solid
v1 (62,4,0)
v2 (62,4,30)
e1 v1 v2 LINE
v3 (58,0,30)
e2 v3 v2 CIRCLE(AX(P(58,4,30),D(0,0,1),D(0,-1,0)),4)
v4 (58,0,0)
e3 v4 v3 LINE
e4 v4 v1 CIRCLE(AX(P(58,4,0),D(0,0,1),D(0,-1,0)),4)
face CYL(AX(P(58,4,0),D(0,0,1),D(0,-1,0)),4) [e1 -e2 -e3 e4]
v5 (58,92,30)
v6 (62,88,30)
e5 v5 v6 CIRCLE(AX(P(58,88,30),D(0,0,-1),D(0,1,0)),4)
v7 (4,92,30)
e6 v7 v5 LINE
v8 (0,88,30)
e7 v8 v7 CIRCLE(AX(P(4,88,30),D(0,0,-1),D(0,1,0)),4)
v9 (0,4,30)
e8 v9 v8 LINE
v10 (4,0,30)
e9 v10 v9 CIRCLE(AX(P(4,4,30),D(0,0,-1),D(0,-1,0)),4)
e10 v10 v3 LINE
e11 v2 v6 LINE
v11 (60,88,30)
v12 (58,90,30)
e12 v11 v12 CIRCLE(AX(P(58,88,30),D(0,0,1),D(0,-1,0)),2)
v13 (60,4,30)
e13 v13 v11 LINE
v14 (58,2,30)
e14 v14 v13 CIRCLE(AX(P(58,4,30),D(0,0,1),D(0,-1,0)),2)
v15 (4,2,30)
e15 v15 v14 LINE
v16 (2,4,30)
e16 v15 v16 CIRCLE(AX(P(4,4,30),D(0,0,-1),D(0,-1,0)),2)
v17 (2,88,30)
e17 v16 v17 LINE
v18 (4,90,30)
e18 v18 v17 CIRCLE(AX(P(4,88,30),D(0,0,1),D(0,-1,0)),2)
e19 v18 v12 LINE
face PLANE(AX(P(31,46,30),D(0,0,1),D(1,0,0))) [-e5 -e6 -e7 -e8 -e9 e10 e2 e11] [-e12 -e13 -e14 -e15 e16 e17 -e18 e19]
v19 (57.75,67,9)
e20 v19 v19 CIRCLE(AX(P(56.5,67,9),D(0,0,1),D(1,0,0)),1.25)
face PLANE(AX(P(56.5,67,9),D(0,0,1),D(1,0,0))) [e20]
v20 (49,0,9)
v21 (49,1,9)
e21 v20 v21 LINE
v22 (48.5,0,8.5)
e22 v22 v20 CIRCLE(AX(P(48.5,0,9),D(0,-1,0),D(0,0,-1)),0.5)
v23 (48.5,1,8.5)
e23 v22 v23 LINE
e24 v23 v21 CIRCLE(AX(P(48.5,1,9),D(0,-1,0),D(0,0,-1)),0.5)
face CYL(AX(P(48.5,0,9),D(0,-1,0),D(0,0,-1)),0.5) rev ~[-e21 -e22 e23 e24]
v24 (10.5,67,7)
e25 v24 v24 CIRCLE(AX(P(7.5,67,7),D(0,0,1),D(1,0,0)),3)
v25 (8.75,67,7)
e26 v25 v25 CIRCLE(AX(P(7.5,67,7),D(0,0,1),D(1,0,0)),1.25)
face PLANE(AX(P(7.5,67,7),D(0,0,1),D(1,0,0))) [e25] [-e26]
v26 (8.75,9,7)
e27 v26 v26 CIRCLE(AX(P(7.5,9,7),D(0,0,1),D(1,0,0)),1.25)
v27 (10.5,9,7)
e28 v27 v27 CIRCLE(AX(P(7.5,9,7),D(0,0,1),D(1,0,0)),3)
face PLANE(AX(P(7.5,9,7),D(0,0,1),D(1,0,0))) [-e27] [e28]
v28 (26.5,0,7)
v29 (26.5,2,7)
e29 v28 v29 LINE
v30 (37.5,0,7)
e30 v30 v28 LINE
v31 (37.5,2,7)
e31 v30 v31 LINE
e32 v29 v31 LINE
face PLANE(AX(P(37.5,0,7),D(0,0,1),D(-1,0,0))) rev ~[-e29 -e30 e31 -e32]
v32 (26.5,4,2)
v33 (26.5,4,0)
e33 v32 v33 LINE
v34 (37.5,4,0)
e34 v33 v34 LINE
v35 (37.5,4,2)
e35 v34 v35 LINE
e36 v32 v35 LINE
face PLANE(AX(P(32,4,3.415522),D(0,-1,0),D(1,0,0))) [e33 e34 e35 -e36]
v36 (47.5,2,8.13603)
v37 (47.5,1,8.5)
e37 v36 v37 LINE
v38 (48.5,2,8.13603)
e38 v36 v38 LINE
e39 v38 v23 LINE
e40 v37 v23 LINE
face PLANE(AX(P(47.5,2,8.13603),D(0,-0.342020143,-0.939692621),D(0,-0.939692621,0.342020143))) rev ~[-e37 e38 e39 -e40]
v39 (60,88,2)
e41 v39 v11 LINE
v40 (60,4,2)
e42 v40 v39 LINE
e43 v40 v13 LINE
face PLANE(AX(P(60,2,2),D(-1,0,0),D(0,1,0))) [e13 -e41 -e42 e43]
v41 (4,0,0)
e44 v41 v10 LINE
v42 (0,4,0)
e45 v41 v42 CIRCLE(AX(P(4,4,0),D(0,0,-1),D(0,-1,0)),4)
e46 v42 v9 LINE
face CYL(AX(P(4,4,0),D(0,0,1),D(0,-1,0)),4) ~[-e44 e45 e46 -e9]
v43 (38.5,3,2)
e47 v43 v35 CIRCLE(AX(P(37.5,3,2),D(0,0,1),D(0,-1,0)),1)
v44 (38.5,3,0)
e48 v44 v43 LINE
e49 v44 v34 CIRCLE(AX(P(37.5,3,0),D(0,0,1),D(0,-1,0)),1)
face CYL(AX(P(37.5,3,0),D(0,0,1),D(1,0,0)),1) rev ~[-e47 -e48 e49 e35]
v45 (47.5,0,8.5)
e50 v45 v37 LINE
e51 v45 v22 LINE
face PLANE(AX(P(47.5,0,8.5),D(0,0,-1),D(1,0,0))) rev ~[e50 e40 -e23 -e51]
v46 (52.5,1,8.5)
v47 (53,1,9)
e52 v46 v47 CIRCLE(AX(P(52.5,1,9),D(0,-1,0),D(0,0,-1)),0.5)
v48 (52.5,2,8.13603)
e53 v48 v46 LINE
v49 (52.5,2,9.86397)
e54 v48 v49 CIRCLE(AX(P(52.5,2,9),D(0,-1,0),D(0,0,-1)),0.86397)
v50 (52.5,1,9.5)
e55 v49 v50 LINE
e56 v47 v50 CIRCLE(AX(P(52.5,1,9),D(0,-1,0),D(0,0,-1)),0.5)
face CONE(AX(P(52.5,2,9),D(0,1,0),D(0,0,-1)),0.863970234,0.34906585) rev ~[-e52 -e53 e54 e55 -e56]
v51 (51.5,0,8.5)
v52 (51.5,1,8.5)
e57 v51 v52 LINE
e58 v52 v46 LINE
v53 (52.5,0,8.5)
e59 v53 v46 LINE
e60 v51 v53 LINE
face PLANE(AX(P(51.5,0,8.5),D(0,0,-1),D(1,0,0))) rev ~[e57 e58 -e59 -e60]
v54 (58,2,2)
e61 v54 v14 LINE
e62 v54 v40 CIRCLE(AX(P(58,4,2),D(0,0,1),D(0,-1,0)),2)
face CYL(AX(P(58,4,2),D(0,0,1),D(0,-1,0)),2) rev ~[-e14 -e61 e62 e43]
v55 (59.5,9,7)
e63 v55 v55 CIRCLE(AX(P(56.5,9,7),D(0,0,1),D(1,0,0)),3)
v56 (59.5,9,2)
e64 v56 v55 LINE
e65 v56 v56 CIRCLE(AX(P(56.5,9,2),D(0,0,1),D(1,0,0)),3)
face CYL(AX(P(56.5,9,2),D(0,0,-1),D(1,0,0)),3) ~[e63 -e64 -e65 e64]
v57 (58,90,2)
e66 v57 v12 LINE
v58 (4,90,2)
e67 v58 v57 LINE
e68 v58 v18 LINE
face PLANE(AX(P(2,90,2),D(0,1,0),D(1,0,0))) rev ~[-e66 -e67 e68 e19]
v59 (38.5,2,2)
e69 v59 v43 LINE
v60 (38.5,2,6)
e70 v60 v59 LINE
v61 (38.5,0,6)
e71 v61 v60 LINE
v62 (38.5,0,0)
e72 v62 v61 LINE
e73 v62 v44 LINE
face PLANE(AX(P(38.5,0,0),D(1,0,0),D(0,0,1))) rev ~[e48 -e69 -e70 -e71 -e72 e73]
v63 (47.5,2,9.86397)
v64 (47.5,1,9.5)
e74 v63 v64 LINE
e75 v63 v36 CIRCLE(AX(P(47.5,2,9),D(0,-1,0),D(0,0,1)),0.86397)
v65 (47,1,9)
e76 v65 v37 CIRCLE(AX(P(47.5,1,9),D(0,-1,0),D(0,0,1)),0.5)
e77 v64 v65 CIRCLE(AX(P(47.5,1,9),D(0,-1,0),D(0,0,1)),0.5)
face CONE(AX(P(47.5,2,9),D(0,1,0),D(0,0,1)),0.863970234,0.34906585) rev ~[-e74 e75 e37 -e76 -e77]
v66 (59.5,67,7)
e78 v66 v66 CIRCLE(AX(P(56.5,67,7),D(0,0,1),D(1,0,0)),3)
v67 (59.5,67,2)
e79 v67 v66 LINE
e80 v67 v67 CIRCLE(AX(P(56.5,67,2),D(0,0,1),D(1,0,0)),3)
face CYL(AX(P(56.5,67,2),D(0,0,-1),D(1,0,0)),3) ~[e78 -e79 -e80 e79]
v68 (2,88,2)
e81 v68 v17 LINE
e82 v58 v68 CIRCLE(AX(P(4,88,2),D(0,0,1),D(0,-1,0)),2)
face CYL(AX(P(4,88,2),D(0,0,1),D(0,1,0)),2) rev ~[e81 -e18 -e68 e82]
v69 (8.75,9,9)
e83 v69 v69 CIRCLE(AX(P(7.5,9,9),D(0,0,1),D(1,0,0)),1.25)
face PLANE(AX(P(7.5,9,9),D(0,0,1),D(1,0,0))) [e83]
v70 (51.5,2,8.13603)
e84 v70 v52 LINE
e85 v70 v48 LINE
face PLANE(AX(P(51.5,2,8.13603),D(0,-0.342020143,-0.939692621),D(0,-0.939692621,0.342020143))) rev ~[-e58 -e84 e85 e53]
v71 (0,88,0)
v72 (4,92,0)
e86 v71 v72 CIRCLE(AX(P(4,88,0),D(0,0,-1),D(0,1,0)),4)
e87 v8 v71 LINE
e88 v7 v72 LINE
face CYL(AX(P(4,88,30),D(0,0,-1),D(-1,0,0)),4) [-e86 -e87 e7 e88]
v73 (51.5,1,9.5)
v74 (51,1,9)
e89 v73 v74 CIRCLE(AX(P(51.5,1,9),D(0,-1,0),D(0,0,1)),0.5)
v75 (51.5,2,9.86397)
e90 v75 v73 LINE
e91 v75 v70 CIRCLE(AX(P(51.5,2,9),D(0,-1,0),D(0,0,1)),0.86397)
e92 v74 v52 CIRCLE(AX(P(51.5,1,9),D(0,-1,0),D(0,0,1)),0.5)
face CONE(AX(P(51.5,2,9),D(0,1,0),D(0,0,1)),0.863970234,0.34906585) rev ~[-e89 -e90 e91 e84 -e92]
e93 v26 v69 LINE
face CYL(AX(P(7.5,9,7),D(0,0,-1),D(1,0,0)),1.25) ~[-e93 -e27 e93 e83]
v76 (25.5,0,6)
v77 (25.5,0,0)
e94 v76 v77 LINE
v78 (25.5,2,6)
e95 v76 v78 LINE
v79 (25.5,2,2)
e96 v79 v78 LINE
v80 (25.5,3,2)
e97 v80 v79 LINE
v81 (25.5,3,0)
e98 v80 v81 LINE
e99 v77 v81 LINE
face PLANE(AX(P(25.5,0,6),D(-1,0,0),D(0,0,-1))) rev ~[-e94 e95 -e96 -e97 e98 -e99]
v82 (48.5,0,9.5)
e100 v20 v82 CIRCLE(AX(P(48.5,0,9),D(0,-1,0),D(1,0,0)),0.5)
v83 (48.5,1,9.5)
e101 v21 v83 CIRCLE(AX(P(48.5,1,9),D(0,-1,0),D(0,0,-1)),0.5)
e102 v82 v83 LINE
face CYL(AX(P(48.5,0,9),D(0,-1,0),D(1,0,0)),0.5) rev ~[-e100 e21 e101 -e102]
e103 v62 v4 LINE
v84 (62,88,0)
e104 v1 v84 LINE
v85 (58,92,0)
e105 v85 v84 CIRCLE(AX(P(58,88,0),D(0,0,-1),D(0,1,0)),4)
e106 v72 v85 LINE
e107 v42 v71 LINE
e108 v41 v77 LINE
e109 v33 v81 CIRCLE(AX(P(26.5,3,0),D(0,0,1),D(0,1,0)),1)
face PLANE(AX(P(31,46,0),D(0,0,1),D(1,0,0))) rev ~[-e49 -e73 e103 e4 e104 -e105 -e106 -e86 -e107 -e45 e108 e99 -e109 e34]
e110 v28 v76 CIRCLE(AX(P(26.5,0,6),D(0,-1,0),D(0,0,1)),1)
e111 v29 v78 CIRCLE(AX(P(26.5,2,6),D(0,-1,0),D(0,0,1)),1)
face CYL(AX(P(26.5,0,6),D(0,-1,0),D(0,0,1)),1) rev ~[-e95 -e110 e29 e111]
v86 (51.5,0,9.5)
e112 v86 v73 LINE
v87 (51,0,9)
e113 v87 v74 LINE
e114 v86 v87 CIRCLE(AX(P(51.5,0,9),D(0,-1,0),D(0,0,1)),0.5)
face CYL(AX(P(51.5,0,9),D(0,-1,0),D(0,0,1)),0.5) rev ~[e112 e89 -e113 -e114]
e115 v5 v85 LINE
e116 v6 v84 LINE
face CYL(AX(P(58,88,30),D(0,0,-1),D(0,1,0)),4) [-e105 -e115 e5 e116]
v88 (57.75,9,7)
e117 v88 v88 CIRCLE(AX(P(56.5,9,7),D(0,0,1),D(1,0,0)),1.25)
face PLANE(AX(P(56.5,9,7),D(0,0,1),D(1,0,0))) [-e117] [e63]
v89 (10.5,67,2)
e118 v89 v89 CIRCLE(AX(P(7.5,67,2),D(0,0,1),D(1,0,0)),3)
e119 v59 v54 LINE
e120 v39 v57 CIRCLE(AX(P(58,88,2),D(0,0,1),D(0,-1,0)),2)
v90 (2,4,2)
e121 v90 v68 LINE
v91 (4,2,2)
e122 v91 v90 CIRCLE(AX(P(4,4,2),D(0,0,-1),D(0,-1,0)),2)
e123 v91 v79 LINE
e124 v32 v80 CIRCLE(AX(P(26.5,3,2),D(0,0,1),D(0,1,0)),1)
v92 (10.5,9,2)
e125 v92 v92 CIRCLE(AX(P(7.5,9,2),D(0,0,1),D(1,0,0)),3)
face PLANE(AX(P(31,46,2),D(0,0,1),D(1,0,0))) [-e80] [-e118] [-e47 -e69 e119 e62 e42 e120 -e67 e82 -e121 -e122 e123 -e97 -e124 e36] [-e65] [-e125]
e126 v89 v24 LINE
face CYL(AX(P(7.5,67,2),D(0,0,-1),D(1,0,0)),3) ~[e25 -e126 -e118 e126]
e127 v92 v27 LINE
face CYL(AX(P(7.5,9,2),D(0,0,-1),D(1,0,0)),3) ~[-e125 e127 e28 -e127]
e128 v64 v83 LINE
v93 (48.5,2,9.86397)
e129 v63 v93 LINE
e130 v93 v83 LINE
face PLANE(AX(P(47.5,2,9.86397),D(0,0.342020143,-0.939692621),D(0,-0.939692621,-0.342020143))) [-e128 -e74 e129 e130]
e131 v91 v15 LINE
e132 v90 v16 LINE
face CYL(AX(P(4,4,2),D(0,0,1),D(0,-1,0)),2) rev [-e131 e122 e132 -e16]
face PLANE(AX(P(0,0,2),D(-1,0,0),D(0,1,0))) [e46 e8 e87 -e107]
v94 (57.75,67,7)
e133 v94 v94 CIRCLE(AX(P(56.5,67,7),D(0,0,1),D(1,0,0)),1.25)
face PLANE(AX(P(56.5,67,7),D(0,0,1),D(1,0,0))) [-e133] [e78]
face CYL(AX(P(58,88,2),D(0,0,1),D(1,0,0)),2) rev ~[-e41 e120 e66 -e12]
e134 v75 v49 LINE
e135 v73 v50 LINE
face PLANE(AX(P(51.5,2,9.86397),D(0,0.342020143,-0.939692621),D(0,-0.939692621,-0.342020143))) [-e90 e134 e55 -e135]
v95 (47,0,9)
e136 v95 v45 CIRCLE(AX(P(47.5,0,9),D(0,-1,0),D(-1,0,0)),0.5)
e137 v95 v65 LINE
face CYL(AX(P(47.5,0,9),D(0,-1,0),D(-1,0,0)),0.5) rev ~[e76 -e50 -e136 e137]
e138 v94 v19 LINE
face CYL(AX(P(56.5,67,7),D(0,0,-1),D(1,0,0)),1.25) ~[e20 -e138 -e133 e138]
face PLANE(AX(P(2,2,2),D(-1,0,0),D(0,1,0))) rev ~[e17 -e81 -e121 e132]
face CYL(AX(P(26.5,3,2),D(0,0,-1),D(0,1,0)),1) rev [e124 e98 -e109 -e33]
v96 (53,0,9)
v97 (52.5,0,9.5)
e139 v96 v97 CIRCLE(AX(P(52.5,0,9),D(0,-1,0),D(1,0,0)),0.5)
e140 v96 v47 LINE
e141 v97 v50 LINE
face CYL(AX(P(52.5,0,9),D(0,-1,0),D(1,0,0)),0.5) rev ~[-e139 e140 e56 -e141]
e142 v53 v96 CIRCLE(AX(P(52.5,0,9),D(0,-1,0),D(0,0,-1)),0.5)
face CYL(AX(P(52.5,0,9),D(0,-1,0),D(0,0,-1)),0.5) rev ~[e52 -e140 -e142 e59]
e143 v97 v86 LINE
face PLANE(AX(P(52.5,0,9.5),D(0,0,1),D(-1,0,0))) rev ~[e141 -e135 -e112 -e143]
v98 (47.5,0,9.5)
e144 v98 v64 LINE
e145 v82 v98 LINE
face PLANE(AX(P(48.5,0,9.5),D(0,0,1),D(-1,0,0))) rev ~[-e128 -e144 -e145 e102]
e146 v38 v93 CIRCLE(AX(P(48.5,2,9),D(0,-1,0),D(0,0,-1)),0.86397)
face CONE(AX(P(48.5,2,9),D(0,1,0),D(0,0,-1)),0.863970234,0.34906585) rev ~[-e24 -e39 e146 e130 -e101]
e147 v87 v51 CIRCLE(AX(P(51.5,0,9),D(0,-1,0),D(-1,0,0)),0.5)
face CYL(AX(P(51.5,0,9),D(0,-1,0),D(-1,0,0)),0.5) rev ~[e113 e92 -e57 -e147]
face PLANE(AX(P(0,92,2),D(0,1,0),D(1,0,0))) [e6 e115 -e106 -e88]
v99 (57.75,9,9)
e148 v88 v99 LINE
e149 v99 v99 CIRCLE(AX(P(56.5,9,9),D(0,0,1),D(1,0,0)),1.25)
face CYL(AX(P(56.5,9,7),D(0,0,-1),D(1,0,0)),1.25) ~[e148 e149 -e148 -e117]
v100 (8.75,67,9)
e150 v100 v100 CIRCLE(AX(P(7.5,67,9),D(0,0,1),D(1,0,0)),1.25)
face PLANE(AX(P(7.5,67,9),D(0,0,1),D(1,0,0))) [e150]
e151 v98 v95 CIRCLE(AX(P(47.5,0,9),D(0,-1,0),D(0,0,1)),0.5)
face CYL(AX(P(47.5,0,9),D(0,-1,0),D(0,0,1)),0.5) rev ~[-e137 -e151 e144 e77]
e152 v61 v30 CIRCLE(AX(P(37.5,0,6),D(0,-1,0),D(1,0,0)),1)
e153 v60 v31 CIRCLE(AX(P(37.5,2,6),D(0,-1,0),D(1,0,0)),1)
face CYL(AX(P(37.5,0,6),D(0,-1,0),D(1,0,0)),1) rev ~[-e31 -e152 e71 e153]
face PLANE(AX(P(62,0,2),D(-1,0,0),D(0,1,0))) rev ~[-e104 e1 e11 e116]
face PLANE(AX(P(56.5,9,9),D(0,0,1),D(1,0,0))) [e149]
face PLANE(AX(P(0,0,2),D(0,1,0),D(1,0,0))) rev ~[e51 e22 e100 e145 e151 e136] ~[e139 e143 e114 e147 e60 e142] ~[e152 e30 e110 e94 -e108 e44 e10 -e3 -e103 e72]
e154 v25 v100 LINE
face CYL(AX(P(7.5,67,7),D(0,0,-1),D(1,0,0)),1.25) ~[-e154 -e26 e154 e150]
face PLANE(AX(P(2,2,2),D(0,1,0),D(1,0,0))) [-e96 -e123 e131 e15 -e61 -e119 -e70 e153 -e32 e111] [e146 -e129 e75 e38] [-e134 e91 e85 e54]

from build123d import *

# Parameters (mm, degrees)
F0_W          = 62
F0_H          = 92
F1_DEPTH      = 2
F2_W          = 62
F2_H          = 92
F2_W_2        = 58
F2_H_2        = 88
F2_R          = 3
F3_DEPTH      = 28
F4_DEPTH      = 23
F5_R          = 1.25
F6_DEPTH      = 2
F7_R          = 1.25
F8_DEPTH      = 2
F9_R          = 1.25
F10_DEPTH     = 2
F11_R         = 1.25
F12_DEPTH     = 2
F14_DEPTH     = 4
F15_R         = 1
F16_R         = 2
F17_R         = 4
F18_T1_DEPTH  = 1
F18_T3_DEPTH  = 1
F18_T6_ANGLE  = 180
F18_T8_ANGLE  = 180
F18_T10_ANGLE = 180
F18_T12_ANGLE = 180


# Not quite as in the source:
# - a fillet or chamfer that OpenCascade refuses, or shapes differently, is made with other operations: its cross-section is extruded or revolved along the edge and cut away or added


with BuildPart() as f1:
    # F0 (on Top) → F1 (new body)
    with BuildSketch(Plane.XY):
        with Locations((31, 46)):
            Rectangle(F0_W, F0_H)
    extrude(amount=F1_DEPTH)

    # F2 (on face) → F3 (join)
    with BuildSketch(Plane.XY.offset(2)):
        with Locations((31, 46)):
            Rectangle(F2_W, F2_H)
        with Locations((31, 46)):
            Rectangle(F2_W_2, F2_H_2, mode=Mode.SUBTRACT)
        with Locations((7.5, 67)):
            Circle(F2_R)
        with Locations((56.5, 67)):
            Circle(F2_R)
        with Locations((7.5, 9)):
            Circle(F2_R)
        with Locations((56.5, 9)):
            Circle(F2_R)
    extrude(amount=F3_DEPTH)

    # F4 (cut): faces of the model
    f4_faces = [f1.faces().sort_by_distance(p)[0] for p in [
        (7.5, 67, 30),
        (56.5, 67, 30),
        (56.5, 9, 30),
        (7.5, 9, 30),
    ]]
    extrude(f4_faces, amount=-F4_DEPTH, mode=Mode.SUBTRACT)

    # F5 (on face) → F6 (join)
    with BuildSketch(Plane.XY.offset(7)):
        with Locations((7.5, 9)):
            Circle(F5_R)
    extrude(amount=F6_DEPTH)

    # F7 (on face) → F8 (join)
    with BuildSketch(Plane.XY.offset(7)):
        with Locations((56.5, 9)):
            Circle(F7_R)
    extrude(amount=F8_DEPTH)

    # F9 (on face) → F10 (join)
    with BuildSketch(Plane.XY.offset(7)):
        with Locations((56.5, 67)):
            Circle(F9_R)
    extrude(amount=F10_DEPTH)

    # F11 (on face) → F12 (join)
    with BuildSketch(Plane.XY.offset(7)):
        with Locations((7.5, 67)):
            Circle(F11_R)
    extrude(amount=F12_DEPTH)

    # F13 (on face) → F14 (cut)
    with BuildSketch(Plane.XZ):
        with BuildLine():
            ThreePointArc((38.5, 6), (38.2071067812, 6.7071067812), (37.5, 7))
            Line((37.5, 7), (26.5, 7))
            ThreePointArc((26.5, 7), (25.7928932188, 6.7071067812), (25.5, 6))
            Line((25.5, 6), (25.5, 0))
            Line((25.5, 0), (38.5, 0))
            Line((38.5, 0), (38.5, 6))
        make_face()
        with BuildLine():
            Line((48.5, 9.5), (47.5, 9.5))
            ThreePointArc((47.5, 9.5), (47.1464466094, 9.3535533906), (47, 9))
            ThreePointArc((47, 9), (47.1464466094, 8.6464466094), (47.5, 8.5))
            Line((47.5, 8.5), (48.5, 8.5))
            ThreePointArc((48.5, 8.5), (48.8535533906, 8.6464466094), (49, 9))
            ThreePointArc((49, 9), (48.8535533906, 9.3535533906), (48.5, 9.5))
        make_face()
        with BuildLine():
            Line((52.5, 9.5), (51.5, 9.5))
            ThreePointArc((51.5, 9.5), (51.1464466094, 9.3535533906), (51, 9))
            ThreePointArc((51, 9), (51.1464466094, 8.6464466094), (51.5, 8.5))
            Line((51.5, 8.5), (52.5, 8.5))
            ThreePointArc((52.5, 8.5), (52.8535533906, 8.6464466094), (53, 9))
            ThreePointArc((53, 9), (52.8535533906, 9.3535533906), (52.5, 9.5))
        make_face()
    extrude(amount=-F14_DEPTH, mode=Mode.SUBTRACT)

    # F15
    f15_edges = [f1.edges().sort_by_distance(p)[0] for p in [
        (25.5, 4, 1),
        (38.5, 4, 1),
    ]]
    fillet(f15_edges, radius=F15_R)

    # F16
    f16_edges = [f1.edges().sort_by_distance(p)[0] for p in [
        (2, 90, 16),
        (60, 90, 16),
        (60, 2, 16),
        (2, 2, 16),
    ]]
    fillet(f16_edges, radius=F16_R)

    # F17
    f17_edges = [f1.edges().sort_by_distance(p)[0] for p in [
        (0, 92, 15),
        (62, 92, 15),
        (62, 0, 15),
        (0, 0, 15),
    ]]
    fillet(f17_edges, radius=F17_R)

    # F18: chamfer of 1 x 0.3639702343 on 8 edges, made by hand

    # F18_s2 → F18_t1 (cut)
    with BuildSketch(Plane.YZ.offset(51.5)):
        Polygon((2, 9.8639702343), (1, 9.5), (2, 9.5), align=None)
        Polygon((2, 8.1360297657), (1, 8.5), (2, 8.5), align=None)
    extrude(amount=F18_T1_DEPTH, mode=Mode.SUBTRACT)

    # F18_s4 → F18_t3 (cut)
    with BuildSketch(Plane.YZ.offset(47.5)):
        Polygon((2, 9.8639702343), (1, 9.5), (2, 9.5), align=None)
        Polygon((2, 8.1360297657), (1, 8.5), (2, 8.5), align=None)
    extrude(amount=F18_T3_DEPTH, mode=Mode.SUBTRACT)

    # F18_s5 → F18_t6 (revolve, cut)
    with BuildSketch(Plane.YZ.offset(51.5)):
        Polygon((2, 9.8639702343), (1, 9.5), (2, 9.5), align=None)
    revolve(axis=Axis((51.5, 2, 9), (0, -1, 0)), revolution_arc=F18_T6_ANGLE, mode=Mode.SUBTRACT)

    # F18_s7 → F18_t8 (revolve, cut)
    with BuildSketch(Plane.YZ.offset(47.5)):
        Polygon((2, 9.8639702343), (1, 9.5), (2, 9.5), align=None)
    revolve(axis=Axis((47.5, 2, 9), (0, -1, 0)), revolution_arc=F18_T8_ANGLE, mode=Mode.SUBTRACT)

    # F18_s9 → F18_t10 (revolve, cut)
    with BuildSketch(Plane.YZ.offset(52.5)):
        Polygon((2, 8.1360297657), (1, 8.5), (2, 8.5), align=None)
    revolve(axis=Axis((52.5, 2, 9), (0, -1, 0)), revolution_arc=F18_T10_ANGLE, mode=Mode.SUBTRACT)

    # F18_s11 → F18_t12 (revolve, cut)
    with BuildSketch(Plane.YZ.offset(48.5)):
        Polygon((2, 8.1360297657), (1, 8.5), (2, 8.5), align=None)
    revolve(axis=Axis((48.5, 2, 9), (0, -1, 0)), revolution_arc=F18_T12_ANGLE, mode=Mode.SUBTRACT)


solid = f1.part
